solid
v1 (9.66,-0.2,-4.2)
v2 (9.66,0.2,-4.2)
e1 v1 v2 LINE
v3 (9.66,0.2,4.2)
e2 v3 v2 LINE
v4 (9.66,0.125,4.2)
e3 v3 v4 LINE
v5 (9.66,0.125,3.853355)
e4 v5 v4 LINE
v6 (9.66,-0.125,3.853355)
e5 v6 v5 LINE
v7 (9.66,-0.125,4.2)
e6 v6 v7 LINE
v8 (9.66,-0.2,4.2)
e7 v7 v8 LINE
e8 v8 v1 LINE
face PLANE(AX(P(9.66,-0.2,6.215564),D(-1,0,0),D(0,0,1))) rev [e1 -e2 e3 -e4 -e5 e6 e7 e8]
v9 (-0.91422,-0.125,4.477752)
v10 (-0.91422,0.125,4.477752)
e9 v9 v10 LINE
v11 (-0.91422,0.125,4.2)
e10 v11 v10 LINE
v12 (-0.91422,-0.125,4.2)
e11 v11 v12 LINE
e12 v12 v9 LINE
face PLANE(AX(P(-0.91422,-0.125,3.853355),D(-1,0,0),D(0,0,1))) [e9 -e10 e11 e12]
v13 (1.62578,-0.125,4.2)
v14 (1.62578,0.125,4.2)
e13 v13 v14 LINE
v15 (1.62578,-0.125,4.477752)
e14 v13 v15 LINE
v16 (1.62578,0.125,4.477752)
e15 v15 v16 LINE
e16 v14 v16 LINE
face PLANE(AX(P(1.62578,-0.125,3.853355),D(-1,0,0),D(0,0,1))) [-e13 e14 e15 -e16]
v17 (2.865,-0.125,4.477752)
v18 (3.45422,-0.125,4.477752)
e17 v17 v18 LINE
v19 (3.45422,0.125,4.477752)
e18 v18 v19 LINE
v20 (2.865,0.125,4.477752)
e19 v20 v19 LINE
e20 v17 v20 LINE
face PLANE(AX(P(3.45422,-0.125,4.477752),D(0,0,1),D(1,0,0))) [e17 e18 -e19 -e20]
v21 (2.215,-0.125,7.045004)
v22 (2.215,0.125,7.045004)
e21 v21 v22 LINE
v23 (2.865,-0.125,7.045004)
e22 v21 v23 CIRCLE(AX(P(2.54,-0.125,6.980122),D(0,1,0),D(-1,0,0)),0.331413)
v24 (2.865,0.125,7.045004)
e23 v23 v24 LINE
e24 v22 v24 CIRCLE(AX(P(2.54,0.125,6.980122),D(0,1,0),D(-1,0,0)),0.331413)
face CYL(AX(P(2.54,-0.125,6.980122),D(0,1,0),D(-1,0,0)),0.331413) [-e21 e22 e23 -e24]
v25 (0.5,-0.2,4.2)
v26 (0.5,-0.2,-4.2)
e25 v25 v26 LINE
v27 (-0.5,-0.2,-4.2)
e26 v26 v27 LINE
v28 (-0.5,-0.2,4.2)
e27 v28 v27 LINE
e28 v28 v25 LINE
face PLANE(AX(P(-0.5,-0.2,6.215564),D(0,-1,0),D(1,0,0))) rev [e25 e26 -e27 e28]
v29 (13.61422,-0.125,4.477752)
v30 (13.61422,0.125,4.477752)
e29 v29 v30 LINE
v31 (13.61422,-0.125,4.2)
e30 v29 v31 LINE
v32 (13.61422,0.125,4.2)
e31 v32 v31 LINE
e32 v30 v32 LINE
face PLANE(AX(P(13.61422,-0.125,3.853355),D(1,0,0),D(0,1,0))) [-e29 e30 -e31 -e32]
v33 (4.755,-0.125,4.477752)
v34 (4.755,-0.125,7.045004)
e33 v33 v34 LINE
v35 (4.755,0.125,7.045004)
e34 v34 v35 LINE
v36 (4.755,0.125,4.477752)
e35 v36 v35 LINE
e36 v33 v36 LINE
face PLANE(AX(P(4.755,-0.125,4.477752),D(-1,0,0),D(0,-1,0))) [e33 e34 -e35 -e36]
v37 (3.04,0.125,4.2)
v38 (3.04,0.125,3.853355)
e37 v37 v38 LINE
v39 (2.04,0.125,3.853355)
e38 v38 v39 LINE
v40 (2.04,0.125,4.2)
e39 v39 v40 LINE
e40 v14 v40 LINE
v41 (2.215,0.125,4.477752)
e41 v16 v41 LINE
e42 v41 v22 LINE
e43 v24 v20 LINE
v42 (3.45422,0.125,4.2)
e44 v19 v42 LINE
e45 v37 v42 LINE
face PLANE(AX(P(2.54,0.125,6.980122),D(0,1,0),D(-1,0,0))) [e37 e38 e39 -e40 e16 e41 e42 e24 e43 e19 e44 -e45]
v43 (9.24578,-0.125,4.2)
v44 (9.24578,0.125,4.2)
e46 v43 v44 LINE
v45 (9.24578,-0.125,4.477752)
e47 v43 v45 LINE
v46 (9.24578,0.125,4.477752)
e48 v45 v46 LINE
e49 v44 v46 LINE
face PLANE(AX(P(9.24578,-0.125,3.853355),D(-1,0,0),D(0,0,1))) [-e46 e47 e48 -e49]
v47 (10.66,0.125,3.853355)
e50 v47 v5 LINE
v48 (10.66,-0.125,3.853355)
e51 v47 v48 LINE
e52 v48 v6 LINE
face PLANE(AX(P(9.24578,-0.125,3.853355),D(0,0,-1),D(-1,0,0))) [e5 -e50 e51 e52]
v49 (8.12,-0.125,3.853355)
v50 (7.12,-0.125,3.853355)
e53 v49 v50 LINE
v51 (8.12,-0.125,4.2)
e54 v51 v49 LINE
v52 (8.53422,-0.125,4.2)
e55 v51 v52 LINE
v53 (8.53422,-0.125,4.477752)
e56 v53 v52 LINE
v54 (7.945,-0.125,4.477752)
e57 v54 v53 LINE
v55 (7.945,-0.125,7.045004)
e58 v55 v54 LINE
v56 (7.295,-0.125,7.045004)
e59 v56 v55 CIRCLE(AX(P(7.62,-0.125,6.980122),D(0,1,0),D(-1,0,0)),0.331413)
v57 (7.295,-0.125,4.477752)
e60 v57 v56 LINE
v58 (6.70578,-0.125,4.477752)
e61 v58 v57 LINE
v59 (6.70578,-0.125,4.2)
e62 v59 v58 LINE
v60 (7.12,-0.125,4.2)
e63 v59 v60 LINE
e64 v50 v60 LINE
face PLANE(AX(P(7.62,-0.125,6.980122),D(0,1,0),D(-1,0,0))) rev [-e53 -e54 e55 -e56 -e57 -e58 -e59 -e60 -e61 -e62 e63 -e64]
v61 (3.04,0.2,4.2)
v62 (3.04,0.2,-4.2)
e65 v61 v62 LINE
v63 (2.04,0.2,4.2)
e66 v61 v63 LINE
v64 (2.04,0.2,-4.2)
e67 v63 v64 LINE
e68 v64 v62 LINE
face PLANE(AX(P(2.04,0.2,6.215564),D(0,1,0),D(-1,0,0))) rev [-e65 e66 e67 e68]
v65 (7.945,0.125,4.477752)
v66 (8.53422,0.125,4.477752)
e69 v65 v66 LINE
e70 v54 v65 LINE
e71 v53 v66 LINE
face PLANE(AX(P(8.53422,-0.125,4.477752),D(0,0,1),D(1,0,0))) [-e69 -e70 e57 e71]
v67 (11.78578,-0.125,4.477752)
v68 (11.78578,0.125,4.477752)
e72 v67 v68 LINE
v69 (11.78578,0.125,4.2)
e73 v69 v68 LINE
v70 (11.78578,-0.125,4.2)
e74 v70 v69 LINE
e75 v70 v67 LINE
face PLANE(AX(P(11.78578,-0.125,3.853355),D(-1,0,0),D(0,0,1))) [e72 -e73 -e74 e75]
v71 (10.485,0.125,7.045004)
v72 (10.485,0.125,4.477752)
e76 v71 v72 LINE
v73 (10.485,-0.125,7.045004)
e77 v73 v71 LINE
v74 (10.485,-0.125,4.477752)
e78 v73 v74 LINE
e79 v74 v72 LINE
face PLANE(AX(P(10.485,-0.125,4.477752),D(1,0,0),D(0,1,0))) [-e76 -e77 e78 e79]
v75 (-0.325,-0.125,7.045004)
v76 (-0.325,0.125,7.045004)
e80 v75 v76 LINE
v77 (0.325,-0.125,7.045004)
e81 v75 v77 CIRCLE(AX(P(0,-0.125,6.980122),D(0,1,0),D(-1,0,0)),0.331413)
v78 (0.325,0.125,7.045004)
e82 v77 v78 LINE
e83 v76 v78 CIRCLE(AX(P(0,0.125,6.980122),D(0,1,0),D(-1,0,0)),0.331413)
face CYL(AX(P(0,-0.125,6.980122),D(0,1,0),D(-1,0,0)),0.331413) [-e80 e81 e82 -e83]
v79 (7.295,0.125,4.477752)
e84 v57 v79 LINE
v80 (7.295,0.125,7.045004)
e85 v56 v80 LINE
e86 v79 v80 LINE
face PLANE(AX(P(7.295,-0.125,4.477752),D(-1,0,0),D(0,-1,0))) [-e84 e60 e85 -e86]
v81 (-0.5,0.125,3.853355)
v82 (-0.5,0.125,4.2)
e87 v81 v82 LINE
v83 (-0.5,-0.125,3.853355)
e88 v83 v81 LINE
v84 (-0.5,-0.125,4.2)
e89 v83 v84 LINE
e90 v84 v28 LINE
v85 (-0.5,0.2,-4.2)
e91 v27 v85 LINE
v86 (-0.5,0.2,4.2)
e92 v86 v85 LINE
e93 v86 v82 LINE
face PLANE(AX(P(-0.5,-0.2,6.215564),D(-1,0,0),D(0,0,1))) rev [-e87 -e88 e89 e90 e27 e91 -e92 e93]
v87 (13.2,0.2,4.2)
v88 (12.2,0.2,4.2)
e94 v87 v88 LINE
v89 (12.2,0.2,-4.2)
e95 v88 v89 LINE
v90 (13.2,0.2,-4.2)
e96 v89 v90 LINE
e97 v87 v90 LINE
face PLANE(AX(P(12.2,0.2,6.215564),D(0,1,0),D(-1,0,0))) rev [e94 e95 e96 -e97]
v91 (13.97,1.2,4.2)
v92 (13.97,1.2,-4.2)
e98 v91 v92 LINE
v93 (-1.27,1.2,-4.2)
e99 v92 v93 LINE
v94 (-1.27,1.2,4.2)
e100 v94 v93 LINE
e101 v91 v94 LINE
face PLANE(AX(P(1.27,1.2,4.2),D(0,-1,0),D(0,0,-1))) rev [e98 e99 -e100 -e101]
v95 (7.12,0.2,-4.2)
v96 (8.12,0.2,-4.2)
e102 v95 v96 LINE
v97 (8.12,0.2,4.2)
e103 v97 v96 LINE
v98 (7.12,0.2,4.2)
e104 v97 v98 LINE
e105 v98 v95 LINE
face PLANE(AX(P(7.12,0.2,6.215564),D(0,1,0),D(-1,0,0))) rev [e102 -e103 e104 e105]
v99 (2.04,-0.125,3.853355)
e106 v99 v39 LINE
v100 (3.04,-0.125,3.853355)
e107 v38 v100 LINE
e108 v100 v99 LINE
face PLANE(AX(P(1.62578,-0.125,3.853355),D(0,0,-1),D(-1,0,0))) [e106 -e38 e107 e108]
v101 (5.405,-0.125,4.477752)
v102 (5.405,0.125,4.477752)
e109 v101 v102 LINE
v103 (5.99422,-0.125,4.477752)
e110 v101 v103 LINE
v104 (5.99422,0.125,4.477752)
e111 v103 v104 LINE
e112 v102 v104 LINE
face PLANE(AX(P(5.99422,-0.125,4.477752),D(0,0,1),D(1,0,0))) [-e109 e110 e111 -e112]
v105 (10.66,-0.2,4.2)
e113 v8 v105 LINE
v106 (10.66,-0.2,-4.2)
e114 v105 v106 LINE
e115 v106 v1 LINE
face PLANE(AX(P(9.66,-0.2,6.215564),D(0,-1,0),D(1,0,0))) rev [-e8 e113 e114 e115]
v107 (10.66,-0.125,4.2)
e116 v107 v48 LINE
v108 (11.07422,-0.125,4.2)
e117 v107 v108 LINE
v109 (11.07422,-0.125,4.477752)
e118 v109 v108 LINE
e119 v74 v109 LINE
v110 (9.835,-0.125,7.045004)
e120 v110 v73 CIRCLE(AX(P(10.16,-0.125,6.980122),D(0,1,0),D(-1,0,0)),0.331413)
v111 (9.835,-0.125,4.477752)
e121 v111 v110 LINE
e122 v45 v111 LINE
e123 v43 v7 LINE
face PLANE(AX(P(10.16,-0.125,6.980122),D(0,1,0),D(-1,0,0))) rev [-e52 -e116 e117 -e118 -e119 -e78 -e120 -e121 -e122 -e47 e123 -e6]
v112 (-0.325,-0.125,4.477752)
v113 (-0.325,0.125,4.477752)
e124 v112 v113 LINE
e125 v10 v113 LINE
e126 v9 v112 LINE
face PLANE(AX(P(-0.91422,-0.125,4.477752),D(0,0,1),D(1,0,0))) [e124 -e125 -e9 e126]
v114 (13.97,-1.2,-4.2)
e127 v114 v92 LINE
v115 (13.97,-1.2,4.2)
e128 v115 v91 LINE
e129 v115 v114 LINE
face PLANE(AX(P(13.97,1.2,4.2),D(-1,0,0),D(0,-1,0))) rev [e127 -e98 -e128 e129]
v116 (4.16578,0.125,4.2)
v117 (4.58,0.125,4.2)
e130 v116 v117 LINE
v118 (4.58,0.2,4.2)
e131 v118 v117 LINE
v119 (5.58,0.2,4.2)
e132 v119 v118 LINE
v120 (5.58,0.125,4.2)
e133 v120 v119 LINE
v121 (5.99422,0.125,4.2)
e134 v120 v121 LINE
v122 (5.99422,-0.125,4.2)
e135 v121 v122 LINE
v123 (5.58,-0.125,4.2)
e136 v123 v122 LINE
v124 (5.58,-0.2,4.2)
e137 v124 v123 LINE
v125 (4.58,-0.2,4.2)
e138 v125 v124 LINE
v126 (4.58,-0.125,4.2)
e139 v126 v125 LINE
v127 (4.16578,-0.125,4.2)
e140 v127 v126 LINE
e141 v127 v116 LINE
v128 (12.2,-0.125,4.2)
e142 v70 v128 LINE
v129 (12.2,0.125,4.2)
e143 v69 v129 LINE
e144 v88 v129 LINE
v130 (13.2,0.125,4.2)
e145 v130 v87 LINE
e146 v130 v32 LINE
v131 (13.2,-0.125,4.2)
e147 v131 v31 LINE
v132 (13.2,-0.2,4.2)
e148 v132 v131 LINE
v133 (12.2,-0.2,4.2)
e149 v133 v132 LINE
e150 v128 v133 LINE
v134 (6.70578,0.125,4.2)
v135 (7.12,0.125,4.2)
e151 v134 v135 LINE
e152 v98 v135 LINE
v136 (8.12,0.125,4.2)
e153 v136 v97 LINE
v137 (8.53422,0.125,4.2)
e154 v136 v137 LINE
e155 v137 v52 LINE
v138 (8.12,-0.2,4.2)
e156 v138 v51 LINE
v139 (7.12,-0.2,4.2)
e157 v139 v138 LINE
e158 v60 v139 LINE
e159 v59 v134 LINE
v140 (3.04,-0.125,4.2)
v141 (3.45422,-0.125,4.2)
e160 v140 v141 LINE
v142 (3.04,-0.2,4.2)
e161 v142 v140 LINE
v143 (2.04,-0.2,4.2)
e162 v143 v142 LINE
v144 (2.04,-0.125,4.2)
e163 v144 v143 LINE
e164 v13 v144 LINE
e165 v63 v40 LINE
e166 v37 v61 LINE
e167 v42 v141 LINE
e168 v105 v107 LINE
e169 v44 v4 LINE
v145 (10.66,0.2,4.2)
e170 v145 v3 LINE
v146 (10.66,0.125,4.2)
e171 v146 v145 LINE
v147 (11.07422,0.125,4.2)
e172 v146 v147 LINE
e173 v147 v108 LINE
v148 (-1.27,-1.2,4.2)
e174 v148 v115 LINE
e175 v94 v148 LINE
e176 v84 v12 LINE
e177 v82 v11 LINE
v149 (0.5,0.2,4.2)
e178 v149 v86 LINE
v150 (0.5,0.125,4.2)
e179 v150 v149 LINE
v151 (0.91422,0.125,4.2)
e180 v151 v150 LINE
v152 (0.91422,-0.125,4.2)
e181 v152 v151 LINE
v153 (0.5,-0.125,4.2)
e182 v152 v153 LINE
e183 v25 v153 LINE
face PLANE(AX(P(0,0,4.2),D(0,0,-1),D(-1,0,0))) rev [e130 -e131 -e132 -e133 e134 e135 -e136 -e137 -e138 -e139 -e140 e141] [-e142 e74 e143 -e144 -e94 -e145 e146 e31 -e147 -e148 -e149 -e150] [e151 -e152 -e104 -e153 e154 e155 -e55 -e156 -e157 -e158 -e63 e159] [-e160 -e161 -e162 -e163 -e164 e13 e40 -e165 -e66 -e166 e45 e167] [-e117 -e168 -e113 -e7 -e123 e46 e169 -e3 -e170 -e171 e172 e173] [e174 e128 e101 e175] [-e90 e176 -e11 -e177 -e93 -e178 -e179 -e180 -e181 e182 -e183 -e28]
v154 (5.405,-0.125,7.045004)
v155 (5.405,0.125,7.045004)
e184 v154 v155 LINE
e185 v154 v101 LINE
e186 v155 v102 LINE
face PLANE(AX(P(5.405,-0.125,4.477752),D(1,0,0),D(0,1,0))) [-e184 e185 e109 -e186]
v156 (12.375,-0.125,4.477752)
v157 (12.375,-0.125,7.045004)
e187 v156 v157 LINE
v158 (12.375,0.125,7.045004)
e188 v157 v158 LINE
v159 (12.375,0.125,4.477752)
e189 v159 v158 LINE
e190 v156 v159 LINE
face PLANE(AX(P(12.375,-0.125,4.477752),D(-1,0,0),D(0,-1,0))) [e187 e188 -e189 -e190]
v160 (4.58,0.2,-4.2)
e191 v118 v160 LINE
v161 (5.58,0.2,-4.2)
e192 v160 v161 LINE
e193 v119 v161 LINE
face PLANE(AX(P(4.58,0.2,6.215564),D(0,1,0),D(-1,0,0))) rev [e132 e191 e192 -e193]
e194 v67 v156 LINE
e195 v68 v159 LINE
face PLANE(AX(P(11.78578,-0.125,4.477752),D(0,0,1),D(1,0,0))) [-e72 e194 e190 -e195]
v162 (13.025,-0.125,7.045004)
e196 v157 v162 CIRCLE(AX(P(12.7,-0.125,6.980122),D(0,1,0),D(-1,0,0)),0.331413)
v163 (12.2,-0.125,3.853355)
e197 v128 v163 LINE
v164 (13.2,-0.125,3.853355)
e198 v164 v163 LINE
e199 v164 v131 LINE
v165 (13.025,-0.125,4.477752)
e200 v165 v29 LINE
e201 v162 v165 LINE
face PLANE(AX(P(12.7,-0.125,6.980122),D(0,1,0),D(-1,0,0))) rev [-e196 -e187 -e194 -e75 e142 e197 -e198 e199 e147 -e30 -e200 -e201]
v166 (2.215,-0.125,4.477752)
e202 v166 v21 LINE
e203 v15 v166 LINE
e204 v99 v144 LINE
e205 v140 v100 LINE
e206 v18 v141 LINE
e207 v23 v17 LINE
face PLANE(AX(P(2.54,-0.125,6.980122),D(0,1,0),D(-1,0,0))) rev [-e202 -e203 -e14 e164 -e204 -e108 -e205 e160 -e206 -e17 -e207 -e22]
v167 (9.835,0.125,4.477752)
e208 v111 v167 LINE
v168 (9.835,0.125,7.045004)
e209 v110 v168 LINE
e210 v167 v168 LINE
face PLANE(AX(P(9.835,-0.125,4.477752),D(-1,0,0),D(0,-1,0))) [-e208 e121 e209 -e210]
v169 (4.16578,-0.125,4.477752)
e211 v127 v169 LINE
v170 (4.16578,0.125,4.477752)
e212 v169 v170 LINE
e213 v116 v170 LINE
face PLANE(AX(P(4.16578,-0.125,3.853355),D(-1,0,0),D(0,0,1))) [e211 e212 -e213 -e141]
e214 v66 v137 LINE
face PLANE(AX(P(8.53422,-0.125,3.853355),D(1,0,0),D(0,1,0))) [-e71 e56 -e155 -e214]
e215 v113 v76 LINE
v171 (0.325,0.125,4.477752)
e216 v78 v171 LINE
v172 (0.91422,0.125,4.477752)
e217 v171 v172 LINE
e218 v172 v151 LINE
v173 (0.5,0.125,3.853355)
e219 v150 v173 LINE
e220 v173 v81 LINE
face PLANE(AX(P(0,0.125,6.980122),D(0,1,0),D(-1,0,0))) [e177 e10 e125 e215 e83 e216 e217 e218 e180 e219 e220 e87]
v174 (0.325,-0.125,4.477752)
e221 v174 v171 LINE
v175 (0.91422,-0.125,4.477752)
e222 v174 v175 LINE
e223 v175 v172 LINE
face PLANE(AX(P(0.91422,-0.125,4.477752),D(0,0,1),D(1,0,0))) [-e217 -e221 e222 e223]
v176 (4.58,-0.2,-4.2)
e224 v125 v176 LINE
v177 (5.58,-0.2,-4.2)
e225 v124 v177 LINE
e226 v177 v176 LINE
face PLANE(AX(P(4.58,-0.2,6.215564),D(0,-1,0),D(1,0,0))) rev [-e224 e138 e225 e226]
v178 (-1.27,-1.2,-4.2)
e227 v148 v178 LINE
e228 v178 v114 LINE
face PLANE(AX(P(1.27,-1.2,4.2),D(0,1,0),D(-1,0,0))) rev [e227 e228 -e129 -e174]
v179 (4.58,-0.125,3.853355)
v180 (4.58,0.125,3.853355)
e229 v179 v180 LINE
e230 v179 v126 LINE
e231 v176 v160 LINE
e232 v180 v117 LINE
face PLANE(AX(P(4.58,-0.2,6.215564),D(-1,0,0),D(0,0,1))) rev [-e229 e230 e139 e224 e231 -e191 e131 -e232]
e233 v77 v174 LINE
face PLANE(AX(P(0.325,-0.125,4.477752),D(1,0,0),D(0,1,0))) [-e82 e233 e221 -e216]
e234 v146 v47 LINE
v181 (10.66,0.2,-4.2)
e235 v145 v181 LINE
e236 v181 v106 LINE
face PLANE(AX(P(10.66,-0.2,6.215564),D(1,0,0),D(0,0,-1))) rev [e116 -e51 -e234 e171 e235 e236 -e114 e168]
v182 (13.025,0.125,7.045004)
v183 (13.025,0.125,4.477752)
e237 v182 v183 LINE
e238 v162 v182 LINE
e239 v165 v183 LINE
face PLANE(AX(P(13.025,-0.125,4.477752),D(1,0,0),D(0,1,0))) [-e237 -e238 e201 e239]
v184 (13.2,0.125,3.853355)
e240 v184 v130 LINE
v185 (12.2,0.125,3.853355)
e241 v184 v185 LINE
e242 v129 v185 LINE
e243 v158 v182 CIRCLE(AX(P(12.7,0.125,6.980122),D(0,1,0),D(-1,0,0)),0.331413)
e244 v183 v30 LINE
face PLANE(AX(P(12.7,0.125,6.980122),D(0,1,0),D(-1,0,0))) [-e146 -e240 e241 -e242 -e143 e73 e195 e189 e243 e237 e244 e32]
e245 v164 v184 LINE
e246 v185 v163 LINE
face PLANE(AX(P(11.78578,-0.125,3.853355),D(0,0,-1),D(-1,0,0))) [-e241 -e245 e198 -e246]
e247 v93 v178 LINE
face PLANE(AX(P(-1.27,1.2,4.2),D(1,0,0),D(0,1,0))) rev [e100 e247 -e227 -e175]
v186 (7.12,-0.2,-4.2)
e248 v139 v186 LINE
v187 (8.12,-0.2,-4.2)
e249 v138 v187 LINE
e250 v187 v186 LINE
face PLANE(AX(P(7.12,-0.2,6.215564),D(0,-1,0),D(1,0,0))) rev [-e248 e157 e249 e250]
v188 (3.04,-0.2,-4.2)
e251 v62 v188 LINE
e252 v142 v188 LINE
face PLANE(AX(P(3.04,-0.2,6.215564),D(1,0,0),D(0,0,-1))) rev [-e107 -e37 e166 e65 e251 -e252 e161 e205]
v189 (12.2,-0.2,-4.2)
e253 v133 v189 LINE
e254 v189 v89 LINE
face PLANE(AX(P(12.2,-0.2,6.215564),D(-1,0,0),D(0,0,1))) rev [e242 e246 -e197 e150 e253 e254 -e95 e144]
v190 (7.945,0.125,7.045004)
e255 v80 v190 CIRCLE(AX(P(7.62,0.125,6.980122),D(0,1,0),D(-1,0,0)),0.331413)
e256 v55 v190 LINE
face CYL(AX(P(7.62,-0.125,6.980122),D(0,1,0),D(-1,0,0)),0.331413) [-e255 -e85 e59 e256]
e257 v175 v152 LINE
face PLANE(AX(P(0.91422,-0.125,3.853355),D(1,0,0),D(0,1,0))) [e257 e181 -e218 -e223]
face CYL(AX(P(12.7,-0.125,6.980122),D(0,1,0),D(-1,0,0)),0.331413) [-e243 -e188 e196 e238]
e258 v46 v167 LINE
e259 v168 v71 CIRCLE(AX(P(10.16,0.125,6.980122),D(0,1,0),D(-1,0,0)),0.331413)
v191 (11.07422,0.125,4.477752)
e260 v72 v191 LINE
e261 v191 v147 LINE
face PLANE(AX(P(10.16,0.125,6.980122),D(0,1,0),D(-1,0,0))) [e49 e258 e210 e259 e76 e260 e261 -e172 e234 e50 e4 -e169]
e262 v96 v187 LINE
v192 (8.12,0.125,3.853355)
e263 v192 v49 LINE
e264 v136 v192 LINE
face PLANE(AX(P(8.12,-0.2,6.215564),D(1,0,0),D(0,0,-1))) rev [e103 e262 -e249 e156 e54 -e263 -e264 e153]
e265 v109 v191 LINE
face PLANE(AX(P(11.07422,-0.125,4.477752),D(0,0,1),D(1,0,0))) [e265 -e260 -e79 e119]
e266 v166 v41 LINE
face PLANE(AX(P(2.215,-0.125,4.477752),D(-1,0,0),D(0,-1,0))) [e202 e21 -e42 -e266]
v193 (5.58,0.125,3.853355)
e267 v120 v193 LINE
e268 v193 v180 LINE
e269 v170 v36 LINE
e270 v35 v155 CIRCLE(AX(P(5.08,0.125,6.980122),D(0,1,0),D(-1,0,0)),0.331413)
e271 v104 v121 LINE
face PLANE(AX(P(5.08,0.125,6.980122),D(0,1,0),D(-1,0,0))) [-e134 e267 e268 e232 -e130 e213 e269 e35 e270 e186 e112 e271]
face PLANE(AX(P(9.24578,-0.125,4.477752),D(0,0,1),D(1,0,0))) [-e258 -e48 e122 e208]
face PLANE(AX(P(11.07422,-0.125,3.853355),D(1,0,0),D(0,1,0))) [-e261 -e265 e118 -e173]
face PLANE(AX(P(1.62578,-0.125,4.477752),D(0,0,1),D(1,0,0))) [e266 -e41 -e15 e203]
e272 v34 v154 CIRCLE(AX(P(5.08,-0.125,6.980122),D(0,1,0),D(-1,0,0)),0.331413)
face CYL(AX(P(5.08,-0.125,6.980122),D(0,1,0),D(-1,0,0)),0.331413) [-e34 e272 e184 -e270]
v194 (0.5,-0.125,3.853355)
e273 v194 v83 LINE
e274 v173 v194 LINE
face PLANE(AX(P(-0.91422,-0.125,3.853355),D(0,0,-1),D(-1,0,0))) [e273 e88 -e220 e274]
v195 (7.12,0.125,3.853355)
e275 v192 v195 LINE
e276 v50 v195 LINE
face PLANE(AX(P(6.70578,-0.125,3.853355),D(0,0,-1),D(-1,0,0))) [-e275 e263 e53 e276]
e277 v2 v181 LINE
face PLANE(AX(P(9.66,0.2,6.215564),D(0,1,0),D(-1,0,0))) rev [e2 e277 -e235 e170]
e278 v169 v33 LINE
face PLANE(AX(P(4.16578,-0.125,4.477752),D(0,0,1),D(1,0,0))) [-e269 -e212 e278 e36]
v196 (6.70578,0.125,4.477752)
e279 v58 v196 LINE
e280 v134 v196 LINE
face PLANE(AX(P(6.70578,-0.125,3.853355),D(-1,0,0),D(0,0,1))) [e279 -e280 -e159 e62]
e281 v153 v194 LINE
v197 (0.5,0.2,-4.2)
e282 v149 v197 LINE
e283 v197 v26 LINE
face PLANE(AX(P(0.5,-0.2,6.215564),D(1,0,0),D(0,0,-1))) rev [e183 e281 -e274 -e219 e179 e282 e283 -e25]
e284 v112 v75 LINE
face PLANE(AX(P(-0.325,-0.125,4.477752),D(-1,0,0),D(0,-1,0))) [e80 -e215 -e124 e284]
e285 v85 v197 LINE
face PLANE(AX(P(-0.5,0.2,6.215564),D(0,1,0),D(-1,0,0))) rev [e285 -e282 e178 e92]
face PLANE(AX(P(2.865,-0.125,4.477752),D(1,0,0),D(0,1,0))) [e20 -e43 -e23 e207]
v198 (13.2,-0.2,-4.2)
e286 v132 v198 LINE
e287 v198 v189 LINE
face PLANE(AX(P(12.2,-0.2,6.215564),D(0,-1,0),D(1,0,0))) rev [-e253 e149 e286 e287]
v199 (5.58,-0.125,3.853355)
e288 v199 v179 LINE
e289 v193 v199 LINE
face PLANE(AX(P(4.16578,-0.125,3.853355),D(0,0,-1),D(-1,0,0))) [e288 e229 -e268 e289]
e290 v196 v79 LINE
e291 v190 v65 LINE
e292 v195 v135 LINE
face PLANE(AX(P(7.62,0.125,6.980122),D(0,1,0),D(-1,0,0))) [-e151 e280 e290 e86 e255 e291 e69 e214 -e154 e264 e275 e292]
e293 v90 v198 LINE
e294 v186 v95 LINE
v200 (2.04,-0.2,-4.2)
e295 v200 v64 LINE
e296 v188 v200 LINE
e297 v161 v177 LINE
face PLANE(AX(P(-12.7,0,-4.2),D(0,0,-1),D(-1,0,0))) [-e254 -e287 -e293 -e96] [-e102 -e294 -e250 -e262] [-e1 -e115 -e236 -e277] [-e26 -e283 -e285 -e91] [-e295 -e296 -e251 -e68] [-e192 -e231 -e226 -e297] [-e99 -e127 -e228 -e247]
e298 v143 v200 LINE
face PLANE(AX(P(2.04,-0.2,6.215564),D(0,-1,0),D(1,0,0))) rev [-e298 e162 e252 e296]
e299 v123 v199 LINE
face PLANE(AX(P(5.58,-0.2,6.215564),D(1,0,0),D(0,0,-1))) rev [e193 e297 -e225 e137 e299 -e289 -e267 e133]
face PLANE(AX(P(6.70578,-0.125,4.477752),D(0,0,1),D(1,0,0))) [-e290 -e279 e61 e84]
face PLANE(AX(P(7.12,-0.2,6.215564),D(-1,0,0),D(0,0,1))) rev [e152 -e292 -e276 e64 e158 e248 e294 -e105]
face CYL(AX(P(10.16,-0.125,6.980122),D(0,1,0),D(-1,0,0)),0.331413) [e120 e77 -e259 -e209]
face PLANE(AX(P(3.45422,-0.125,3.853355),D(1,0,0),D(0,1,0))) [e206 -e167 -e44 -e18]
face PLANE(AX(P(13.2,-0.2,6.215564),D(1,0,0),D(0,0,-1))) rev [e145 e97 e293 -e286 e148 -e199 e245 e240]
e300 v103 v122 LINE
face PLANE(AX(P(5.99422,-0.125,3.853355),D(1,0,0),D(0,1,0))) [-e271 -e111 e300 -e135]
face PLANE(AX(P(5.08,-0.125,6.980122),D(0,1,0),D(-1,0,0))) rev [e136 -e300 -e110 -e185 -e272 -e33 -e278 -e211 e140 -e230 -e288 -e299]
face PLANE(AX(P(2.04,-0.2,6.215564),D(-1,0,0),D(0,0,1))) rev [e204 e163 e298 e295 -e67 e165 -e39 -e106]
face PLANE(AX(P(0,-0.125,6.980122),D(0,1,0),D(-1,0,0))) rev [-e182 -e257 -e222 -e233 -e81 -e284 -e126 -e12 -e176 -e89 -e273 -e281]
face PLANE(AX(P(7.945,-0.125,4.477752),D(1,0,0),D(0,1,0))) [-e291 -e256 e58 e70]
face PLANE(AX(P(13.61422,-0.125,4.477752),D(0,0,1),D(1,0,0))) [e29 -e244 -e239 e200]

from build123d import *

# Parameters (mm, degrees)
SKETCH1_W               = 2.54
SKETCH1_H               = 2.4
SKETCH1_W_2             = 1.4
SKETCH1_H_2             = 1.45
BOSS_EXTRUDE1_DEPTH     = 4.2
BOSS_EXTRUDE3_START     = -1.2
BOSS_EXTRUDE3_DEPTH     = 0.125
LPATTERN1_START         = -0.125
LPATTERN1_DEPTH         = 0.25
LPATTERN1_2_DEPTH       = 0.25
LPATTERN1_3_DEPTH       = 0.25
LPATTERN1_4_DEPTH       = 0.25
LPATTERN1_START_2       = -4.2
LPATTERN1_5_OUTLINE_W   = 12.7
LPATTERN1_5_OUTLINE_H   = 2.4
LPATTERN1_5_OUTLINE_W_2 = 1.4
LPATTERN1_5_OUTLINE_H_2 = 1.45
LPATTERN1_5_DEPTH       = 8.4
LPATTERN1_6_DEPTH       = 0.25
BOSS_EXTRUDE4_START     = -8.4
SKETCH5_W               = 1.4
SKETCH5_H               = 1.45
SKETCH5_W_2             = 1
SKETCH5_H_2             = 0.4
BOSS_EXTRUDE4_DEPTH     = 8.4
LPATTERN2_COUNT         = 6
LPATTERN2_PITCH         = 2.54


# Read off the part's stored shape, not the designer's step: LPattern1
with BuildPart() as part:
    # Sketch1 → Boss-Extrude1 (new, symmetric)
    with BuildSketch(Plane.XY):
        Rectangle(SKETCH1_W, SKETCH1_H)
        Rectangle(SKETCH1_W_2, SKETCH1_H_2, mode=Mode.SUBTRACT)
    extrude(amount=BOSS_EXTRUDE1_DEPTH, both=True)

    # LPattern1 5 outline → LPattern1 5 (add)
    with BuildSketch(Plane.XY.offset(LPATTERN1_START_2)):
        with Locations((7.62, 0)):
            Rectangle(LPATTERN1_5_OUTLINE_W, LPATTERN1_5_OUTLINE_H)
        with Locations((2.54, 0)):
            Rectangle(LPATTERN1_5_OUTLINE_W_2, LPATTERN1_5_OUTLINE_H_2, mode=Mode.SUBTRACT)
        with Locations((5.08, 0)):
            Rectangle(LPATTERN1_5_OUTLINE_W_2, LPATTERN1_5_OUTLINE_H_2, mode=Mode.SUBTRACT)
        with Locations((7.62, 0)):
            Rectangle(LPATTERN1_5_OUTLINE_W_2, LPATTERN1_5_OUTLINE_H_2, mode=Mode.SUBTRACT)
        with Locations((10.16, 0)):
            Rectangle(LPATTERN1_5_OUTLINE_W_2, LPATTERN1_5_OUTLINE_H_2, mode=Mode.SUBTRACT)
        with Locations((12.7, 0)):
            Rectangle(LPATTERN1_5_OUTLINE_W_2, LPATTERN1_5_OUTLINE_H_2, mode=Mode.SUBTRACT)
    extrude(amount=LPATTERN1_5_DEPTH)



with BuildPart() as body_2:
    # Sketch3 → Boss-Extrude3 (new, symmetric)
    with BuildSketch(Plane(origin=(0, 1.2, 0), x_dir=(1, 0, 0), z_dir=(0, 1, 0)).offset(BOSS_EXTRUDE3_START)):
        with BuildLine():
            Line((-0.914219602, -3.853355377), (-0.914219602, -4.477752268))
            Line((-0.914219602, -4.477752268), (-0.325, -4.477752268))
            Line((-0.325, -4.477752268), (-0.325, -7.045003795))
            ThreePointArc((-0.325, -7.045003795), (0, -7.311534777), (0.325, -7.045003795))
            Line((0.325, -7.045003795), (0.325, -4.477752268))
            Line((0.325, -4.477752268), (0.914219602, -4.477752268))
            Line((0.914219602, -4.477752268), (0.914219602, -3.853355377))
            Line((0.914219602, -3.853355377), (-0.914219602, -3.853355377))
        make_face()
    extrude(amount=BOSS_EXTRUDE3_DEPTH, both=True)


with BuildPart() as body_3:
    # LPattern1 outline → LPattern1 (new body)
    with BuildSketch(Plane(origin=(0, 0, 0), x_dir=(1, 0, 0), z_dir=(0, 1, 0)).offset(LPATTERN1_START)):
        with BuildLine():
            Line((11.074219602, -4.477752268), (11.074219602, -3.853355377))
            Line((11.074219602, -3.853355377), (9.245780398, -3.853355377))
            Line((9.245780398, -3.853355377), (9.245780398, -4.477752268))
            Line((9.245780398, -4.477752268), (9.835, -4.477752268))
            Line((9.835, -4.477752268), (9.835, -7.045003795))
            ThreePointArc((9.835, -7.045003795), (10.16, -7.311534777), (10.485, -7.045003795))
            Line((10.485, -7.045003795), (10.485, -4.477752268))
            Line((10.485, -4.477752268), (11.074219602, -4.477752268))
        make_face()
    extrude(amount=LPATTERN1_DEPTH)


with BuildPart() as body_4:
    # LPattern1 2 outline → LPattern1 2 (new body)
    with BuildSketch(Plane(origin=(0, 0, 0), x_dir=(1, 0, 0), z_dir=(0, 1, 0)).offset(LPATTERN1_START)):
        with BuildLine():
            Line((8.534219602, -4.477752268), (8.534219602, -3.853355377))
            Line((8.534219602, -3.853355377), (6.705780398, -3.853355377))
            Line((6.705780398, -3.853355377), (6.705780398, -4.477752268))
            Line((6.705780398, -4.477752268), (7.295, -4.477752268))
            Line((7.295, -4.477752268), (7.295, -7.045003795))
            ThreePointArc((7.295, -7.045003795), (7.62, -7.311534777), (7.945, -7.045003795))
            Line((7.945, -7.045003795), (7.945, -4.477752268))
            Line((7.945, -4.477752268), (8.534219602, -4.477752268))
        make_face()
    extrude(amount=LPATTERN1_2_DEPTH)


with BuildPart() as body_5:
    # LPattern1 3 outline → LPattern1 3 (new body)
    with BuildSketch(Plane(origin=(0, 0, 0), x_dir=(1, 0, 0), z_dir=(0, 1, 0)).offset(LPATTERN1_START)):
        with BuildLine():
            Line((5.994219602, -4.477752268), (5.994219602, -3.853355377))
            Line((5.994219602, -3.853355377), (4.165780398, -3.853355377))
            Line((4.165780398, -3.853355377), (4.165780398, -4.477752268))
            Line((4.165780398, -4.477752268), (4.755, -4.477752268))
            Line((4.755, -4.477752268), (4.755, -7.045003795))
            ThreePointArc((4.755, -7.045003795), (5.08, -7.311534777), (5.405, -7.045003795))
            Line((5.405, -7.045003795), (5.405, -4.477752268))
            Line((5.405, -4.477752268), (5.994219602, -4.477752268))
        make_face()
    extrude(amount=LPATTERN1_3_DEPTH)


with BuildPart() as body_6:
    # LPattern1 4 outline → LPattern1 4 (new body)
    with BuildSketch(Plane(origin=(0, 0, 0), x_dir=(1, 0, 0), z_dir=(0, 1, 0)).offset(LPATTERN1_START)):
        with BuildLine():
            Line((3.454219602, -4.477752268), (3.454219602, -3.853355377))
            Line((3.454219602, -3.853355377), (1.625780398, -3.853355377))
            Line((1.625780398, -3.853355377), (1.625780398, -4.477752268))
            Line((1.625780398, -4.477752268), (2.215, -4.477752268))
            Line((2.215, -4.477752268), (2.215, -7.045003795))
            ThreePointArc((2.215, -7.045003795), (2.54, -7.311534777), (2.865, -7.045003795))
            Line((2.865, -7.045003795), (2.865, -4.477752268))
            Line((2.865, -4.477752268), (3.454219602, -4.477752268))
        make_face()
    extrude(amount=LPATTERN1_4_DEPTH)


with BuildPart() as body_7:
    # LPattern1 6 outline → LPattern1 6 (new body)
    with BuildSketch(Plane(origin=(0, 0, 0), x_dir=(1, 0, 0), z_dir=(0, 1, 0)).offset(LPATTERN1_START)):
        with BuildLine():
            Line((13.614219602, -4.477752268), (13.614219602, -3.853355377))
            Line((13.614219602, -3.853355377), (11.785780398, -3.853355377))
            Line((11.785780398, -3.853355377), (11.785780398, -4.477752268))
            Line((11.785780398, -4.477752268), (12.375, -4.477752268))
            Line((12.375, -4.477752268), (12.375, -7.045003795))
            ThreePointArc((12.375, -7.045003795), (12.7, -7.311534777), (13.025, -7.045003795))
            Line((13.025, -7.045003795), (13.025, -4.477752268))
            Line((13.025, -4.477752268), (13.614219602, -4.477752268))
        make_face()
    extrude(amount=LPATTERN1_6_DEPTH)


with BuildPart() as part_1:
    add(part.part)

    add(body_7.part)  # Boss-Extrude4 merges body 7
    # Sketch5 → Boss-Extrude4 (add)
    with BuildSketch(Plane(origin=(0, 0, -4.2), x_dir=(-1, 0, 0), z_dir=(0, 0, -1)).offset(BOSS_EXTRUDE4_START)):
        with Locations((-12.7, 0)):
            Rectangle(SKETCH5_W, SKETCH5_H)
        with Locations((-12.7, 0)):
            Rectangle(SKETCH5_W_2, SKETCH5_H_2, mode=Mode.SUBTRACT)
    boss_extrude4 = extrude(amount=BOSS_EXTRUDE4_DEPTH)


    add(body_2.part)  # LPattern2 merges body 2

    add(body_3.part)  # LPattern2 merges body 3

    add(body_4.part)  # LPattern2 merges body 4

    add(body_5.part)  # LPattern2 merges body 5

    add(body_6.part)  # LPattern2 merges body 6
    # LPattern2: Boss-Extrude4 ×6
    with Locations(*[(-i * LPATTERN2_PITCH, 0, 0) for i in range(1, LPATTERN2_COUNT)]):
        add(boss_extrude4)


solid = part_1.part
